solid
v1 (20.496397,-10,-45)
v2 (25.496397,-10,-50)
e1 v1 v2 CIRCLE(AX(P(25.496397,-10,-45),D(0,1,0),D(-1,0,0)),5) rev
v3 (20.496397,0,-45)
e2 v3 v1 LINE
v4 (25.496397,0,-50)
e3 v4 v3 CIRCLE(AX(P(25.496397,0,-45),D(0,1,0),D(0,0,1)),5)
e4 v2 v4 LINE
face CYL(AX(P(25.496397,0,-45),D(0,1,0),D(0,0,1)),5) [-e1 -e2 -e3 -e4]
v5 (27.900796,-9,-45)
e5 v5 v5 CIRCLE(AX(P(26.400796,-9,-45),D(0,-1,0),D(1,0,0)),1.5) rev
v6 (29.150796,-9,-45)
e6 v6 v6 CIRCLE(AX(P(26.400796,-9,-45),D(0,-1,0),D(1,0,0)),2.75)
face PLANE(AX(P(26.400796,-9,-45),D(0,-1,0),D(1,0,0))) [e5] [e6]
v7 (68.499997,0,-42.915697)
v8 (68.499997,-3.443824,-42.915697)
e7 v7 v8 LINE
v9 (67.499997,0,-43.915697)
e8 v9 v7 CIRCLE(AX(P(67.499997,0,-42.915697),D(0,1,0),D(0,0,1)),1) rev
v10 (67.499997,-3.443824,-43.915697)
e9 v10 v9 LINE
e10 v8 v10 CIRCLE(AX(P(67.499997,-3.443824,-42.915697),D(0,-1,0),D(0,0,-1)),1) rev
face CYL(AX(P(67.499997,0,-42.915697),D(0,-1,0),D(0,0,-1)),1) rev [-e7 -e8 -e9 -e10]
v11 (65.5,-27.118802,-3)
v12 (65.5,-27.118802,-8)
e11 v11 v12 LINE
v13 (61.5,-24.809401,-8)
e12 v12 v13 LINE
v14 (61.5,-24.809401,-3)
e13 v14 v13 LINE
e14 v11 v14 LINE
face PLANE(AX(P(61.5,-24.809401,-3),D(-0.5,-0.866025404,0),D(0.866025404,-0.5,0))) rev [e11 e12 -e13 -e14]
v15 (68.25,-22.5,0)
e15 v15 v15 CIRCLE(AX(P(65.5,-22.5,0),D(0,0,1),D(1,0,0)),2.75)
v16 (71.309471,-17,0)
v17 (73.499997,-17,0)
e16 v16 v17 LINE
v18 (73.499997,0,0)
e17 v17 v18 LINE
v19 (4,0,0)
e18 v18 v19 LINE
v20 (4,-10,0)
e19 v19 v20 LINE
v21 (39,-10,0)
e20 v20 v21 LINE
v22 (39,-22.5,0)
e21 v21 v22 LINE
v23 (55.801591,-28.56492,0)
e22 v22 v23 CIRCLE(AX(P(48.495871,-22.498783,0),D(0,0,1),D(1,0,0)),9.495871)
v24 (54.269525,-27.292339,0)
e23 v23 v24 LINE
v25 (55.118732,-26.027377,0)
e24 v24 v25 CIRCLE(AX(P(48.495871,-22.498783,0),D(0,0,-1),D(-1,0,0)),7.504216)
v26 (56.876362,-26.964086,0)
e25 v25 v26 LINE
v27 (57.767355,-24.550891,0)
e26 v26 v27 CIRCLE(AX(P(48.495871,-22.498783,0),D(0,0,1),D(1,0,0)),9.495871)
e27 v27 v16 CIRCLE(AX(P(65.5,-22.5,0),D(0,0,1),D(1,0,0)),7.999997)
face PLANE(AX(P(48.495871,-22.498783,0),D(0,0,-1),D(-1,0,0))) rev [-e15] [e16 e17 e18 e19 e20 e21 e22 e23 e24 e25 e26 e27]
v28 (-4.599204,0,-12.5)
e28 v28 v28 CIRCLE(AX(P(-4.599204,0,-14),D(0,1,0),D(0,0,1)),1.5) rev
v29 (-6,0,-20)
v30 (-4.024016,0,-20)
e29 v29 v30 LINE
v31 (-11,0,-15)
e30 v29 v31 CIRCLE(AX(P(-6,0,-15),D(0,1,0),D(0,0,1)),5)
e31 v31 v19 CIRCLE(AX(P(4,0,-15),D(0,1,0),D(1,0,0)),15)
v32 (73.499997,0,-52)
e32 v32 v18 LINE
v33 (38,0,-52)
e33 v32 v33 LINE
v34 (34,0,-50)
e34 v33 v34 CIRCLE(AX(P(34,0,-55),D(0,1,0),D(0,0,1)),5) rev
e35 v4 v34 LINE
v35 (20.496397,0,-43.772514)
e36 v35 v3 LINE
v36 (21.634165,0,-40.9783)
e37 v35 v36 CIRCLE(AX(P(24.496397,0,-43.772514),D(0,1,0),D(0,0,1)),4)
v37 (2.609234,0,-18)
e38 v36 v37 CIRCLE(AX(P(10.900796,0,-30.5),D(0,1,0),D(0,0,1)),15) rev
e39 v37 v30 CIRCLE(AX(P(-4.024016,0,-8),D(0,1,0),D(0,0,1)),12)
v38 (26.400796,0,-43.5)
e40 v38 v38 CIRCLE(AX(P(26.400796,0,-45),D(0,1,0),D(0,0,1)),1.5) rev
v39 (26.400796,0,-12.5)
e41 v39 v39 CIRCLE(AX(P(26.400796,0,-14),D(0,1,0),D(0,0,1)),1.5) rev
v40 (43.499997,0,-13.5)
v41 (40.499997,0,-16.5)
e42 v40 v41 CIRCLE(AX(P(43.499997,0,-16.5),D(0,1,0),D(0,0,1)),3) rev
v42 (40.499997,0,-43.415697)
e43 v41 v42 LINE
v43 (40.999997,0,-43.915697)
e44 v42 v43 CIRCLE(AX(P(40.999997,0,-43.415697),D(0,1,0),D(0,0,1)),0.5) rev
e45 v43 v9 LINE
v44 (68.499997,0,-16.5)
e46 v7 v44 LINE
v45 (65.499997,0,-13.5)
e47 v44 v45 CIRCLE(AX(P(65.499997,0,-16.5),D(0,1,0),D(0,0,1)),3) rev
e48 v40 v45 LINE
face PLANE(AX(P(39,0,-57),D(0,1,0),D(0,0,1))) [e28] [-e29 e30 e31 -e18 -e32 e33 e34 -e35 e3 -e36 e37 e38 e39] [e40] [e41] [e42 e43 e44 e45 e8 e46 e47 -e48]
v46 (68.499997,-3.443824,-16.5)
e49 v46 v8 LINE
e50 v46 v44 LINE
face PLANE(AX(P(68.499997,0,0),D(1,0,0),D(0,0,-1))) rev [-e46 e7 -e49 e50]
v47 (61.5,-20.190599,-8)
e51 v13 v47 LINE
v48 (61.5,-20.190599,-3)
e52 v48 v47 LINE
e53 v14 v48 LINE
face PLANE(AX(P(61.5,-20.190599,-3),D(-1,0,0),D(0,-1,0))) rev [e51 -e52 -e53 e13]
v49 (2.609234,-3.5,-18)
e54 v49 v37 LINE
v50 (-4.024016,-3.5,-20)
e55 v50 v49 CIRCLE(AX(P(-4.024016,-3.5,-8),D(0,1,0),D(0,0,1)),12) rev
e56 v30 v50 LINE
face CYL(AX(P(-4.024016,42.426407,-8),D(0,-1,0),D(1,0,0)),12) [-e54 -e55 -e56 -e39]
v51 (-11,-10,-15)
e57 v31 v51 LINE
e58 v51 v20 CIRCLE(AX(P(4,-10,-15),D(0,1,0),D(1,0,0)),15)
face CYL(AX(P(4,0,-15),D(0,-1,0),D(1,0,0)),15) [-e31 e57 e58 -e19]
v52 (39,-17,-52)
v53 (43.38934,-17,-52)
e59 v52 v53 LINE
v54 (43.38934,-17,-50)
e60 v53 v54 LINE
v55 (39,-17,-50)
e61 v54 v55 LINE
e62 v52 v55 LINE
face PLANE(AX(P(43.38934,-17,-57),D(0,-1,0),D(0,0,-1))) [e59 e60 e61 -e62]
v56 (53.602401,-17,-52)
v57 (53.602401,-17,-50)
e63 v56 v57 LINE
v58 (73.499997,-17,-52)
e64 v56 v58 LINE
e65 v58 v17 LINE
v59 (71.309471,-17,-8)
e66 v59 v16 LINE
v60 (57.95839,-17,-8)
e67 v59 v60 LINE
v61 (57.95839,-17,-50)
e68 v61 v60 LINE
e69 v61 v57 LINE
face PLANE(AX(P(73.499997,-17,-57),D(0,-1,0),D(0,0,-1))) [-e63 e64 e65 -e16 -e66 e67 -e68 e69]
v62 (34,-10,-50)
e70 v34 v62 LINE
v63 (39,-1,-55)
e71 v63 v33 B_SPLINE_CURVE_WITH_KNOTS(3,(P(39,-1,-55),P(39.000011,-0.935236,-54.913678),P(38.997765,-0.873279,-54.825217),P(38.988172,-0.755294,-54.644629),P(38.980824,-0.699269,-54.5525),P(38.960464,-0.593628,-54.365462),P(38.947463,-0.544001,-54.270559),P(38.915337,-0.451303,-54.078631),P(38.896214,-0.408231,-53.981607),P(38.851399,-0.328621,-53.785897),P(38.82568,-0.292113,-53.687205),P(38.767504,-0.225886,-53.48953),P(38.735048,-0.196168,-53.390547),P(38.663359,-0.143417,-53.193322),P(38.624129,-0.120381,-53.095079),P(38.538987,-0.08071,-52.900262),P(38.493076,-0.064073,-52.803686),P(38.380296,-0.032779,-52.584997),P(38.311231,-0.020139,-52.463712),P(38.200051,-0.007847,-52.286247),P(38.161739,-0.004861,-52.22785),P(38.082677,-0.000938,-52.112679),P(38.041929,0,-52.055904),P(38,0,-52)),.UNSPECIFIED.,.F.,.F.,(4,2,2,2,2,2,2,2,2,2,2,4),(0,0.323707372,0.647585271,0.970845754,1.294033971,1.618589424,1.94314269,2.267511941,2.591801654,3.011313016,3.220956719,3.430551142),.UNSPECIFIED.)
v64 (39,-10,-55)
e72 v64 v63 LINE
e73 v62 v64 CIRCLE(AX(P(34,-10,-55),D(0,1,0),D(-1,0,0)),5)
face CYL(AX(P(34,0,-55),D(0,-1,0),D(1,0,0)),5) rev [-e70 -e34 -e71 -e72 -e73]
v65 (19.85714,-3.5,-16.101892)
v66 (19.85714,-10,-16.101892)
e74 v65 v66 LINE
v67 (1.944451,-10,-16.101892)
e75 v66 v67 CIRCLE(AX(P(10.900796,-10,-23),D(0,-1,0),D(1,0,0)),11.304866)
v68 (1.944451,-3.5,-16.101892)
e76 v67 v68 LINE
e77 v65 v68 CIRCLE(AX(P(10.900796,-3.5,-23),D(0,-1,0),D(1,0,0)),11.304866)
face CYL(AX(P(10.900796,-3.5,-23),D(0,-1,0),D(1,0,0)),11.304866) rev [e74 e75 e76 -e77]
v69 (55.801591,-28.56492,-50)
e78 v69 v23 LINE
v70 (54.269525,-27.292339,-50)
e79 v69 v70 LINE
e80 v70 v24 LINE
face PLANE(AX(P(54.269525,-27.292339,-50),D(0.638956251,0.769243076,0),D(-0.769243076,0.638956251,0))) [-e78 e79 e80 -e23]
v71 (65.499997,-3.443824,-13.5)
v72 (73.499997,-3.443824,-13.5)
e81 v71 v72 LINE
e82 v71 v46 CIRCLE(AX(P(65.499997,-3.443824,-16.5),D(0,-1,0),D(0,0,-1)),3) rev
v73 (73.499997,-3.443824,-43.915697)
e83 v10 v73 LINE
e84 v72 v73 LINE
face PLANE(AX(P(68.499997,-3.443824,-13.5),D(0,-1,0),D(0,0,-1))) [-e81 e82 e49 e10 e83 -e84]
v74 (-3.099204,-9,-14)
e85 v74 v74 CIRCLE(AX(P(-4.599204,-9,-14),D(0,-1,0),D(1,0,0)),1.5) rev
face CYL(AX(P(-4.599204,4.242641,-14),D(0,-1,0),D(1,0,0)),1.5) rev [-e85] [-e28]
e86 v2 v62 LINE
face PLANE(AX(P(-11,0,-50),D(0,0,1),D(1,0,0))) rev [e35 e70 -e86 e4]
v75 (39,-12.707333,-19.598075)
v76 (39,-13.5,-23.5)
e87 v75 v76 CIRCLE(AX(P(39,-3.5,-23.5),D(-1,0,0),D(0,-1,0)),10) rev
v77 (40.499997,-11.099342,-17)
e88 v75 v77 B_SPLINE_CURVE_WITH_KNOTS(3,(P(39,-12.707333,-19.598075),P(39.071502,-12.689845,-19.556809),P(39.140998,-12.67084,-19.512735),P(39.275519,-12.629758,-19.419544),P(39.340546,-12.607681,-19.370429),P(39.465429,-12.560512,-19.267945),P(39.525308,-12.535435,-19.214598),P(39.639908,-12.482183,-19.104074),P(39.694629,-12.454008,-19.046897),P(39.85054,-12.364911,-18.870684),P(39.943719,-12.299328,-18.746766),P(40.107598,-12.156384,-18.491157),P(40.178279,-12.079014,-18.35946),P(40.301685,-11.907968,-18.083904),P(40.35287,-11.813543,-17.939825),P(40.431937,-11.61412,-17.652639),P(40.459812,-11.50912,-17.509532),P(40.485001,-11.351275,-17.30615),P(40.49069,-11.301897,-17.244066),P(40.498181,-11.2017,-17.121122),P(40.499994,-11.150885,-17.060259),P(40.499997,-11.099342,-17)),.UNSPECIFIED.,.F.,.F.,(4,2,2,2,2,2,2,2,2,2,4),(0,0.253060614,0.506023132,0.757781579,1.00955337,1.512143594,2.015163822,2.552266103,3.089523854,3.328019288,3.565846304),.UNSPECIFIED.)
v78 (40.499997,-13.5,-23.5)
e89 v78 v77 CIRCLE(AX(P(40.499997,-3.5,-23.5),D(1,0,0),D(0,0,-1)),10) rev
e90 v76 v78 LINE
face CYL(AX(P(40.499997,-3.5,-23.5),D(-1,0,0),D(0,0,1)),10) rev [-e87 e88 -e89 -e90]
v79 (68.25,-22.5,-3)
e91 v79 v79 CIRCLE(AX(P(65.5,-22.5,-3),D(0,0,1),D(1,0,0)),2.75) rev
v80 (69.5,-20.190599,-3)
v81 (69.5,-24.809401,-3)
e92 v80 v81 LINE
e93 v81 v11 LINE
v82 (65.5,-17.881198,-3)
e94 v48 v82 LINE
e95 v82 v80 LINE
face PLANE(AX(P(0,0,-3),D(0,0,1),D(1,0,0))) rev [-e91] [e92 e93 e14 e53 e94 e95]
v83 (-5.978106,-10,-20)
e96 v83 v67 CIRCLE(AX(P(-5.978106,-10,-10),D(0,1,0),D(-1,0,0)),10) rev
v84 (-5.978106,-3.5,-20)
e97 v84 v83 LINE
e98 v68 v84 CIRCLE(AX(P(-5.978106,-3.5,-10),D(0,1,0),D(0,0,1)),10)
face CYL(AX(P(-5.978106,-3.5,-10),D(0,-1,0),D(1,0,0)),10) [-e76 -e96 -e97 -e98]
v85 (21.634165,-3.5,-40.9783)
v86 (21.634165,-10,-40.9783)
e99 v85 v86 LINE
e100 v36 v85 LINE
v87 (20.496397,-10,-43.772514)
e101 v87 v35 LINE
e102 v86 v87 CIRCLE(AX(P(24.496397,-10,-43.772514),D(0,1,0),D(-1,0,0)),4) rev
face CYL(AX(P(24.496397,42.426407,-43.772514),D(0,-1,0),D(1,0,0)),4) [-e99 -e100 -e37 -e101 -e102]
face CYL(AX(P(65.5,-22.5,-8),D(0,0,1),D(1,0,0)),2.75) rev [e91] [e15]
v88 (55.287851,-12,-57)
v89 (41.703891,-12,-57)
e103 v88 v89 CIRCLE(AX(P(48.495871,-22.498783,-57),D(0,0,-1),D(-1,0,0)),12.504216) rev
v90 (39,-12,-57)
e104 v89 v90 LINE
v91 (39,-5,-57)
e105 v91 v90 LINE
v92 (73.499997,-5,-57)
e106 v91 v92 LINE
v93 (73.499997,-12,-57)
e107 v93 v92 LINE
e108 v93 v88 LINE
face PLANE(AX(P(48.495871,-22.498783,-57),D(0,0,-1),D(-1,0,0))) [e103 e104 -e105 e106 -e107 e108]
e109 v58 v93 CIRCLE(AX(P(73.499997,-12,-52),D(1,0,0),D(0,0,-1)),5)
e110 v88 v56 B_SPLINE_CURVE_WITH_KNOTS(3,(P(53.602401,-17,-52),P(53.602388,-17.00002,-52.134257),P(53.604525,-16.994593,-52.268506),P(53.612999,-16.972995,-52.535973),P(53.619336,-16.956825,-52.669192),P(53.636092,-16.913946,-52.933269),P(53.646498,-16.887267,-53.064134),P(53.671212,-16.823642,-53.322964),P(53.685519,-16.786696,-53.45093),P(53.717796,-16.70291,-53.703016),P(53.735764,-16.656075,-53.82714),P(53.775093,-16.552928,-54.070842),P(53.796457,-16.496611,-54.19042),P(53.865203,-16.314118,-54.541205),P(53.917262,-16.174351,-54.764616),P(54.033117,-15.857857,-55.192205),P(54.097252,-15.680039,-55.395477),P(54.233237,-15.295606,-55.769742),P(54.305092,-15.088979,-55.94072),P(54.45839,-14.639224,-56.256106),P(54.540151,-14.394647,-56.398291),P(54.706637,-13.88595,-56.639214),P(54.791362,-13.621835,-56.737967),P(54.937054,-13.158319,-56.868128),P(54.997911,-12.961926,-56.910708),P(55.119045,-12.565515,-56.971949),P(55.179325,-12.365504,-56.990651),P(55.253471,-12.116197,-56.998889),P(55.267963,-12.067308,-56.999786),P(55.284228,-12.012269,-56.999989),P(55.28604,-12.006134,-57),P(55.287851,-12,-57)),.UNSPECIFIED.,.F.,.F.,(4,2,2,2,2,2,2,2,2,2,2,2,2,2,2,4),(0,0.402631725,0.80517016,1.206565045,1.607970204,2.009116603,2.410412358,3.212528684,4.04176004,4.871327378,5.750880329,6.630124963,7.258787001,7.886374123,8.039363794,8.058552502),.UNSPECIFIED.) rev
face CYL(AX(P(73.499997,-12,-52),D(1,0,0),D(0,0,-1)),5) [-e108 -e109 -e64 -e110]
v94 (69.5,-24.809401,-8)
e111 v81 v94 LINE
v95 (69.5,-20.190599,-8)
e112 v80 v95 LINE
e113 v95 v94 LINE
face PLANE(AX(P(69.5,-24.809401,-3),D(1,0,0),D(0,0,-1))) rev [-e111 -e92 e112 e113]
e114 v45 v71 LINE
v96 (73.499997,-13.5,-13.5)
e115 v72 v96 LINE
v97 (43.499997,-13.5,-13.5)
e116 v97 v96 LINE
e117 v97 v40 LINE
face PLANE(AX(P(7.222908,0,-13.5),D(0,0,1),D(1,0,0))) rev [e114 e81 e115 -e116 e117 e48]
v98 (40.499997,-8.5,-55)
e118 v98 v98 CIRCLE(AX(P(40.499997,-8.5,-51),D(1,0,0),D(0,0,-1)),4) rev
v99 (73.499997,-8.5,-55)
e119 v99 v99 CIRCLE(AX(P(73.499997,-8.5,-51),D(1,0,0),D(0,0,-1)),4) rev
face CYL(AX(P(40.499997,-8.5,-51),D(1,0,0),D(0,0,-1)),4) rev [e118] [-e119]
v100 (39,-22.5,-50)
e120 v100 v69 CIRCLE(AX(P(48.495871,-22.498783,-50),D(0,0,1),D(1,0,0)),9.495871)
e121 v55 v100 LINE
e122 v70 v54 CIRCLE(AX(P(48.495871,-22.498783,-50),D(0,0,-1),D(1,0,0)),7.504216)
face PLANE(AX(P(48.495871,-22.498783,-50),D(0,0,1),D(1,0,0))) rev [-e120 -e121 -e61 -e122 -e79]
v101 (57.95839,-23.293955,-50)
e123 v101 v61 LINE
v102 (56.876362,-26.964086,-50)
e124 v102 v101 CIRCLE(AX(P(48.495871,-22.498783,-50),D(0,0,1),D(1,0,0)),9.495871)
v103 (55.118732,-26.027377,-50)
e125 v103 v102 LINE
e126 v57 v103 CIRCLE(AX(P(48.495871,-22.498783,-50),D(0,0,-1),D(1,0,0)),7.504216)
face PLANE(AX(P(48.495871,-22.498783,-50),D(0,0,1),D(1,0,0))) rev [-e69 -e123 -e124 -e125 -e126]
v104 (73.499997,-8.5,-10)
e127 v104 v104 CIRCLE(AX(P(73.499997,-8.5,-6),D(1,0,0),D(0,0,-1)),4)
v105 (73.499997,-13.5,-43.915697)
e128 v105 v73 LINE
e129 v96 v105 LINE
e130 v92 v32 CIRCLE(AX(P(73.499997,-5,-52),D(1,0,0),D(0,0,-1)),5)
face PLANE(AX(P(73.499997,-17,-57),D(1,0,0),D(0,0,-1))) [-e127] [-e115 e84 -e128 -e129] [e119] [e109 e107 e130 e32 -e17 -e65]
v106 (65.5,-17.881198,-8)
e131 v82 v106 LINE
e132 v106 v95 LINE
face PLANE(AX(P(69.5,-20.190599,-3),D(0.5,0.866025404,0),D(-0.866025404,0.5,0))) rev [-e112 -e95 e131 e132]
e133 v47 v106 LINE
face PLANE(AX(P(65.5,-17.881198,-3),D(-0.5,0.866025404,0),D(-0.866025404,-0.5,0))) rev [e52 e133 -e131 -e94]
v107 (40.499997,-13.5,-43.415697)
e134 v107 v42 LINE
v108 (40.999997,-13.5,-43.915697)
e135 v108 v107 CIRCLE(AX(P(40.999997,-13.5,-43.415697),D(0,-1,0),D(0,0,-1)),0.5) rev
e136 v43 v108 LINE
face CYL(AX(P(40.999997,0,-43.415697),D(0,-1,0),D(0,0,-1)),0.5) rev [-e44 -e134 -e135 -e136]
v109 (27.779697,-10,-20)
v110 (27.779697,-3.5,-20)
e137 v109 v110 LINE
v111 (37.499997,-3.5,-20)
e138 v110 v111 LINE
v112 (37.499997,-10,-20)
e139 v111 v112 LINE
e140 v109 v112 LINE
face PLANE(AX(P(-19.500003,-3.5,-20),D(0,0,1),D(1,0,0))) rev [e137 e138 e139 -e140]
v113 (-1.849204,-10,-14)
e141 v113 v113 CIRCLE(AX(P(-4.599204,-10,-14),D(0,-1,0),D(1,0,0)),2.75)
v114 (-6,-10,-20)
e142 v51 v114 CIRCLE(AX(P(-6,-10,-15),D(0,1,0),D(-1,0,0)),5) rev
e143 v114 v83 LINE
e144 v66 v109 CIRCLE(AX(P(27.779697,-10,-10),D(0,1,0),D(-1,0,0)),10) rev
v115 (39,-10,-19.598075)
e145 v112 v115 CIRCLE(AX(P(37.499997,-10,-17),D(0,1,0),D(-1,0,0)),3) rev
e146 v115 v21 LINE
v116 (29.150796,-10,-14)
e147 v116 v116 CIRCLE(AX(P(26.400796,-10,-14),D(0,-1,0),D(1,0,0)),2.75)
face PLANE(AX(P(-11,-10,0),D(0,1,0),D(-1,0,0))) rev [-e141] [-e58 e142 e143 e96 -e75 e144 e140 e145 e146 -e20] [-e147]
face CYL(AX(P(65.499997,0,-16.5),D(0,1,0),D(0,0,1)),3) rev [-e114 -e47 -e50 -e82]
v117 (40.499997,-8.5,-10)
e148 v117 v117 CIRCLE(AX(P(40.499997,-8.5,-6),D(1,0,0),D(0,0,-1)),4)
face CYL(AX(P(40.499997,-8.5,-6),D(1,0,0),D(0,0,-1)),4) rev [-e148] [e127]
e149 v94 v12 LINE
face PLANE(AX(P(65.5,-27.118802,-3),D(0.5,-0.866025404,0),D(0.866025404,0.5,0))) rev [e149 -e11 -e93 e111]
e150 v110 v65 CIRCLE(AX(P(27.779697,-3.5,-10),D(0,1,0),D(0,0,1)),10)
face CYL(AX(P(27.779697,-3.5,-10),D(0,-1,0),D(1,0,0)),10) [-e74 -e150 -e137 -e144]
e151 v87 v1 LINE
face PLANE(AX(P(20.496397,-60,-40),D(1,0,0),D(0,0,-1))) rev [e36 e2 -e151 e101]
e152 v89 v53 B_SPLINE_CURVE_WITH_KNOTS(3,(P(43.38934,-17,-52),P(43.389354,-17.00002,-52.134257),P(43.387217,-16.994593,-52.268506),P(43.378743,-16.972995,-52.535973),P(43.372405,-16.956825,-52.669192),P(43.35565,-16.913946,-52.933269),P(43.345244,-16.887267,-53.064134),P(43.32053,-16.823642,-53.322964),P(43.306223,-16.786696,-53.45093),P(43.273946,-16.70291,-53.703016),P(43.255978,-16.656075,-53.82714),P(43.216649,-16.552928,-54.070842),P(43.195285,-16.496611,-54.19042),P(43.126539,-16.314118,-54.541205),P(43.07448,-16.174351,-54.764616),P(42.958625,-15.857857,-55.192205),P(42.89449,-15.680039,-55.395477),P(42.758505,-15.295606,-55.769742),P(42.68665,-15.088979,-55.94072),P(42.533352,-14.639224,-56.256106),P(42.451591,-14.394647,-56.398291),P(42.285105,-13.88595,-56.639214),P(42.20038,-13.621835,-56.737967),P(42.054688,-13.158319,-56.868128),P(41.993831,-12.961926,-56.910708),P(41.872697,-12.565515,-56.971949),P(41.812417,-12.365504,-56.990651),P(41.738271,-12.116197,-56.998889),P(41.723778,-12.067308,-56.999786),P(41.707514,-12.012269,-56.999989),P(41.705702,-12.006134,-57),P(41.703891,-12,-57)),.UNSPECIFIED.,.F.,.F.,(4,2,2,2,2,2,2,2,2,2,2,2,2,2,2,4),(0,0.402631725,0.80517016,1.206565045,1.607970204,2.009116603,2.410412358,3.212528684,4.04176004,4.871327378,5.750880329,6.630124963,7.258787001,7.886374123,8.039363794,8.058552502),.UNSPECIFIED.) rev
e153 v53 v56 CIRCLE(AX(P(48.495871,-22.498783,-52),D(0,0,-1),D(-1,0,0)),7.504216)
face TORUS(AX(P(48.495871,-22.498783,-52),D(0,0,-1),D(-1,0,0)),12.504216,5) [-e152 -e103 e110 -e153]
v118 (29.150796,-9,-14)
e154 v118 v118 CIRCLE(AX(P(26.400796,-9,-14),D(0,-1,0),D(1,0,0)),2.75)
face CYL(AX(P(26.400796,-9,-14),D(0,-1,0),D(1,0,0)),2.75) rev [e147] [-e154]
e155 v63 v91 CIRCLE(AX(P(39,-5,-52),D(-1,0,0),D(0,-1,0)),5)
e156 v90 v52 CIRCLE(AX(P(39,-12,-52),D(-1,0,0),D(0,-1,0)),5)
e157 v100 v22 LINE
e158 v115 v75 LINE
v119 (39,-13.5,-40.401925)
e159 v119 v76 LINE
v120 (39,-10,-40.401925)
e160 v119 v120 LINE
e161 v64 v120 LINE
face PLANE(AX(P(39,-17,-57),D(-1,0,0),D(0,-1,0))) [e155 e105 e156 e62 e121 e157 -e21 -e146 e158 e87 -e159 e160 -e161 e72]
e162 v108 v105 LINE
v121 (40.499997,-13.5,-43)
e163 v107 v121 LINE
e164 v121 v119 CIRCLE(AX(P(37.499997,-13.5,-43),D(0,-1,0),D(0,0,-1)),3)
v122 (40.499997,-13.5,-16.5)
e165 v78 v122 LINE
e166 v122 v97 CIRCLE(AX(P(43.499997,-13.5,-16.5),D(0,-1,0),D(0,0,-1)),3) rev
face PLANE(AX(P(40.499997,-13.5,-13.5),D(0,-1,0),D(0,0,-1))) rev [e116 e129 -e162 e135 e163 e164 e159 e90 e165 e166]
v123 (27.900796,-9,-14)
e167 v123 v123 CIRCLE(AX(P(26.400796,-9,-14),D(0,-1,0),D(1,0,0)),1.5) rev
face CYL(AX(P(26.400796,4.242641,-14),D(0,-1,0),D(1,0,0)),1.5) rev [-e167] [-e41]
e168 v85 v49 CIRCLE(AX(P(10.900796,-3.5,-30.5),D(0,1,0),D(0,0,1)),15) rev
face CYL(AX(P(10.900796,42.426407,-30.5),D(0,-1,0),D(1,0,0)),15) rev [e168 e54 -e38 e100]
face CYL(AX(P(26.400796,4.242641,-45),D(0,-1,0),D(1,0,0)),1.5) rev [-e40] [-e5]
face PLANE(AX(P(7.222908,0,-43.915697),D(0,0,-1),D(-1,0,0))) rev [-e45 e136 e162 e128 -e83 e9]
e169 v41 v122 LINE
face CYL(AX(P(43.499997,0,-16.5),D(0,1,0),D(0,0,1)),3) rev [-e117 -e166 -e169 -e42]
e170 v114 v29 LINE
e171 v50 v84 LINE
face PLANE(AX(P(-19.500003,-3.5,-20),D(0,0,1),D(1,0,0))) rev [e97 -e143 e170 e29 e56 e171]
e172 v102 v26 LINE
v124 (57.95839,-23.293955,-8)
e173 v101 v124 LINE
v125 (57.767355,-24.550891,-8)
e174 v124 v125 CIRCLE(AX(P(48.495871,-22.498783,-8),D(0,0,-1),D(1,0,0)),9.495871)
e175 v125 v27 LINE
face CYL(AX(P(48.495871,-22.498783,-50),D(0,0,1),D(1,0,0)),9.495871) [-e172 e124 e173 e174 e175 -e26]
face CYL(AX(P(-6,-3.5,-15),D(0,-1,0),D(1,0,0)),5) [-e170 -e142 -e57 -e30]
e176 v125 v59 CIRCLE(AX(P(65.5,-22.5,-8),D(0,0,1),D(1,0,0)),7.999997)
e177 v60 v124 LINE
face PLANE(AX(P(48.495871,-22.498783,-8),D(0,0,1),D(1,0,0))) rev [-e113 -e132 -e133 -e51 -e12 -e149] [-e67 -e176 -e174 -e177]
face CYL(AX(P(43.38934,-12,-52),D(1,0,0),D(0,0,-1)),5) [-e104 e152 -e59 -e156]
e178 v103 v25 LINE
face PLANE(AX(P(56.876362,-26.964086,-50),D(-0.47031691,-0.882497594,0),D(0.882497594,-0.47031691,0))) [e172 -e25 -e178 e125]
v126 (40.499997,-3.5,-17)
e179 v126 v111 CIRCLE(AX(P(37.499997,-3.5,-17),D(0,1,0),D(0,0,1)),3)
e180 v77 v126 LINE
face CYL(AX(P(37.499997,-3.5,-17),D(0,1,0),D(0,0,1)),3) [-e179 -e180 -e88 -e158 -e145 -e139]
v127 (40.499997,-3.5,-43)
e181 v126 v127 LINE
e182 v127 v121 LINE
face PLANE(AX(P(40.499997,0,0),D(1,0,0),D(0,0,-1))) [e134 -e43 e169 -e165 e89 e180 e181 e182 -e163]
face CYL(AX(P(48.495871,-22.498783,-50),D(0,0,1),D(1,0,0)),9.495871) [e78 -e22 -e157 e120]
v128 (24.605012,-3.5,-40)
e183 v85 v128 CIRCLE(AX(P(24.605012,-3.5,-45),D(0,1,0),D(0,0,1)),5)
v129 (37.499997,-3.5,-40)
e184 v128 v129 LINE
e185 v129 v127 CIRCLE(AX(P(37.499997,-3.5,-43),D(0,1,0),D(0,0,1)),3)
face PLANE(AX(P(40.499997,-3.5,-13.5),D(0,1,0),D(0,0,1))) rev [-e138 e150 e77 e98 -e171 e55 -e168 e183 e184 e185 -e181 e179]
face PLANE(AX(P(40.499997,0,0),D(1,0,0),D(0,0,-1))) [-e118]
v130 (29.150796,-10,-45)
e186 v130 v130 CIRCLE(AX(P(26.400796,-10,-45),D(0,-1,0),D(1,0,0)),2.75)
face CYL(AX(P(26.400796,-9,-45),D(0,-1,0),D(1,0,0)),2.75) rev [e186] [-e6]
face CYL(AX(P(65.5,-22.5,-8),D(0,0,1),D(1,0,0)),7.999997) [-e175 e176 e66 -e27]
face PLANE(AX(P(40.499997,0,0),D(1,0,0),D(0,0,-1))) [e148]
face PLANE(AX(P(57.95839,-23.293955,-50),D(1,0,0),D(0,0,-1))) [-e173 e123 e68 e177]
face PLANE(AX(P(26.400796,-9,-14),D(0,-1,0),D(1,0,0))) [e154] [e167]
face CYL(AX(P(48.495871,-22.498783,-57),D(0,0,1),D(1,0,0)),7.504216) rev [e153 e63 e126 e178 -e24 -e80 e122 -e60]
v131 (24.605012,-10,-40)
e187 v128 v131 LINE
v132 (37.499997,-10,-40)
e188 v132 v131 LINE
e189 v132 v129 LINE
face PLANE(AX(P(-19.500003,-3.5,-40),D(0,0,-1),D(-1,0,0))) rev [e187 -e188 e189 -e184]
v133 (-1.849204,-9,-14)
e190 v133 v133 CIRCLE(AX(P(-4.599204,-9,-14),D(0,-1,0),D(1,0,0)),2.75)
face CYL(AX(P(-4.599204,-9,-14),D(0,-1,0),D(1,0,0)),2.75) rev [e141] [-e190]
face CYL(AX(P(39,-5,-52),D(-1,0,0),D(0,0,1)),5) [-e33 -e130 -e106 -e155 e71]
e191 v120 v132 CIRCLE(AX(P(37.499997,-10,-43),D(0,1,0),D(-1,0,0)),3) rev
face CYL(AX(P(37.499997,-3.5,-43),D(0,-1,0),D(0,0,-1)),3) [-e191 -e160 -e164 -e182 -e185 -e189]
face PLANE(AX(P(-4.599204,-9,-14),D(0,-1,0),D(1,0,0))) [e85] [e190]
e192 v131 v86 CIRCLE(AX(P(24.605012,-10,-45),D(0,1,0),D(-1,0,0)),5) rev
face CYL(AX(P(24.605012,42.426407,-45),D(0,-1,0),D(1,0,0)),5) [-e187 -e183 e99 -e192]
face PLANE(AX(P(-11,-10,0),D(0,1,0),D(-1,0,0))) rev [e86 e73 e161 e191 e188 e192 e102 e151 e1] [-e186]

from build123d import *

# Parameters (mm, degrees)
EXTRUDE1_DEPTH               = 57
SKETCH2_R                    = 2.75
EXTRUDE2_DEPTH               = 8
EXTRUDE3_DEPTH               = 5
EXTRUDE4_DEPTH               = 50
SKETCH5_R                    = 4
EXTRUDE5_DEPTH               = 33
SKETCH6_W                    = 30
SKETCH6_H                    = 10
EXTRUDE6_DEPTH               = 33
SKETCH7_W                    = 50
SKETCH7_H                    = 10
EXTRUDE7_DEPTH               = 50
SKETCH10_R                   = 1.5
EXTRUDE10_DEPTH              = 10
SKETCH11_R                   = 2.75
EXTRUDE13_DEPTH              = 1
SKETCH12_R                   = 15
EXTRUDE14_DEPTH              = 10
FILLET2_R                    = 5
FILLET3_R                    = 5
FILLET4_R                    = 10
EXTRUDE15_REACH              = 96.553
SKETCH14_W                   = 20
SKETCH14_H                   = 10
EXTRUDE16_DEPTH              = 60
EXTRUDE18_DEPTH              = 60
FILLET5_R                    = 10
FILLET7_R                    = 3
FILLET8_R                    = 5
FILLET9_R                    = 5
SKETCH16_R                   = 11.304866209
EXTRUDE19_DEPTH              = 6.5
FILLET11_R                   = 12
FILLET12_R                   = 10
FILLET13_R                   = 4
FILLET14_R                   = 5
FILLET15_R                   = 5
EXTRUDE21_DEPTH              = 10
SCHIZZO1_W                   = 30.415697361
SCHIZZO1_H                   = 13.5
TAGLIO_ESTRUSIONE1_DEPTH     = 33
RACCORDO1_R                  = 3
RACCORDO2_R                  = 0.5
SCHIZZO2_W                   = 30.415697361
SCHIZZO2_H                   = 3.443824092
ESTRUSIONE_ESTRUSIONE1_DEPTH = 5
RACCORDO3_R                  = 1
RACCORDO4_R                  = 3
SCHIZZO3_W                   = 12.709856415
SCHIZZO3_H                   = 30.470472699
ESTRUSIONE_ESTRUSIONE2_DEPTH = 3.5


# Some blends are built 0.0001 mm under size
with BuildPart() as part:
    # Sketch1 → Extrude1 (new body)
    with BuildSketch(Plane.XY):
        with BuildLine():
            Line((73.499997202, -17), (73.499997202, 0))
            Line((73.499997202, 0), (39, 0))
            Line((39, 0), (39, -17))
            Line((39, -17), (43.389340395, -17))
            ThreePointArc((43.389340395, -17), (48.49587093, -14.994566191), (53.602401465, -17))
            Line((53.602401465, -17), (73.499997202, -17))
        make_face()
    extrude(amount=-EXTRUDE1_DEPTH)

    # Sketch2 → Extrude2 (add)
    with BuildSketch(Plane.XY):
        with BuildLine():
            Line((57.95839, -23.293955), (57.95839, -17))
            Line((57.95839, -17), (71.309471167, -17))
            ThreePointArc((71.309471167, -17), (69.395977388, -29.48722516), (57.767354943, -24.550891432))
            ThreePointArc((57.767354943, -24.550891432), (57.883931975, -23.925623937), (57.95839, -23.293955))
        make_face()
        with Locations((65.5, -22.5)):
            Circle(SKETCH2_R, mode=Mode.SUBTRACT)
    extrude(amount=-EXTRUDE2_DEPTH)

    # Sketch3 → Extrude3 (cut)
    with BuildSketch(Plane(origin=(0, 0, -8), x_dir=(-1, 0, 0), z_dir=(0, 0, -1))):
        Polygon((-69.5, -20.190598923), (-65.5, -17.881197846), (-61.5, -20.190598923), (-61.5, -24.809401077), (-65.5, -27.118802154), (-69.5, -24.809401077), align=None)
    extrude(amount=-EXTRUDE3_DEPTH, mode=Mode.SUBTRACT)

    # Sketch4 → Extrude4 (add)
    with BuildSketch(Plane.XY):
        with BuildLine():
            Line((39, -17), (39, -22.5))
            ThreePointArc((39, -22.5), (45.271742795, -31.43055539), (55.801591252, -28.564919557))
            Line((55.801591252, -28.564919557), (54.269524764, -27.292339419))
            ThreePointArc((54.269524764, -27.292339419), (43.338902241, -27.950290613), (43.389340395, -17))
            Line((43.389340395, -17), (39, -17))
        make_face()
        with BuildLine():
            Line((56.876362299, -26.964085637), (55.118731957, -26.027376827))
            ThreePointArc((55.118731957, -26.027376827), (55.896414133, -21.25571178), (53.602401465, -17))
            Line((53.602401465, -17), (57.95839, -17))
            Line((57.95839, -17), (57.95839, -23.293955))
            ThreePointArc((57.95839, -23.293955), (57.60414849, -25.184084529), (56.876362299, -26.964085637))
        make_face()
    extrude(amount=-EXTRUDE4_DEPTH)

    # Sketch5 → Extrude5 (cut)
    with BuildSketch(Plane(origin=(73.499997202, 0, 0), x_dir=(0, 0, -1), z_dir=(1, 0, 0))):
        with Locations((6, -8.5)):
            Circle(SKETCH5_R)
        with Locations((51, -8.5)):
            Circle(SKETCH5_R)
    extrude(amount=-EXTRUDE5_DEPTH, mode=Mode.SUBTRACT)

    # Sketch6 → Extrude6 (cut)
    with BuildSketch(Plane(origin=(73.499997202, 0, 0), x_dir=(0, 0, -1), z_dir=(1, 0, 0))):
        with Locations((28.5, -8.5)):
            Rectangle(SKETCH6_W, SKETCH6_H)
    extrude(amount=-EXTRUDE6_DEPTH, mode=Mode.SUBTRACT)

    # Sketch7 → Extrude7 (add)
    with BuildSketch(Plane.ZY.offset(-39)):
        with Locations((-25, -5)):
            Rectangle(SKETCH7_W, SKETCH7_H)
    extrude(amount=EXTRUDE7_DEPTH)

    # Sketch10 → Extrude10 (cut)
    with BuildSketch(Plane.XZ.offset(10)):
        with Locations((-4.599204374, -45)):
            Circle(SKETCH10_R)
        with Locations((26.400795626, -45)):
            Circle(SKETCH10_R)
        with Locations((26.400795626, -14)):
            Circle(SKETCH10_R)
        with Locations((-4.599204374, -14)):
            Circle(SKETCH10_R)
    extrude(amount=-EXTRUDE10_DEPTH, mode=Mode.SUBTRACT)

    # Sketch11 → Extrude13 (cut)
    with BuildSketch(Plane.XZ.offset(10)):
        with Locations((-4.599204374, -14)):
            Circle(SKETCH11_R)
        with Locations((26.400795626, -14)):
            Circle(SKETCH11_R)
        with Locations((26.400795626, -45)):
            Circle(SKETCH11_R)
    extrude(amount=-EXTRUDE13_DEPTH, mode=Mode.SUBTRACT)

    # Sketch12 → Extrude14 (cut)
    with BuildSketch(Plane.XZ.offset(10)):
        with Locations((10.900795626, -30.5)):
            Circle(SKETCH12_R)
    extrude(amount=-EXTRUDE14_DEPTH, mode=Mode.SUBTRACT)

    # Fillet2
    fillet2_edges = [part.edges().sort_by_distance(p)[0] for p in [
        (48.49587093, -14.994566191, -57),
        (63.551199334, -17, -57),
        (41.194670197, -17, -57),
    ]]
    fillet(fillet2_edges, radius=FILLET2_R)

    # Fillet3
    fillet3_edges = [part.edges().sort_by_distance(p)[0] for p in [
        (56.249998601, 0, -57),
    ]]
    fillet(fillet3_edges, radius=FILLET3_R)

    # Fillet4
    fillet4_edges = [part.edges().sort_by_distance(p)[0] for p in [
        (56.999997202, -13.5, -43.5),
    ]]
    fillet(fillet4_edges, radius=FILLET4_R - 0.0001)  # a hair under: the kernel refuses the full size

    # Extrude15: up to this face of the body (flat: up to its plane)
    extrude15_end = Plane(part.part.faces().sort_by_distance((35.938109504, 0, -24.375937497))[0])
    # Sketch13 → Extrude15 (cut, up to the picked face)
    with BuildSketch(Plane.XZ.offset(17), mode=Mode.PRIVATE) as extrude15_sk1:
        with BuildLine():
            Line((57.95839, -16.137451745), (57.95839, -43.862548255))
            ThreePointArc((57.95839, -43.862548255), (69.999997202, -30), (57.95839, -16.137451745))
        make_face()
    extrude15_tool1 = split(extrude(extrude15_sk1.sketch, amount=-EXTRUDE15_REACH, mode=Mode.PRIVATE), bisect_by=extrude15_end, keep=Keep.BOTH, mode=Mode.PRIVATE)
    add(extrude15_tool1.solids().sort_by(Axis((63.013259, -17, -30), (0, 1, 0)))[0], mode=Mode.SUBTRACT)

    # Sketch14 → Extrude16 (cut)
    with BuildSketch(Plane(origin=(40.499997202, 0, 0), x_dir=(0, 0, -1), z_dir=(1, 0, 0))):
        with Locations((30, -8.5)):
            Rectangle(SKETCH14_W, SKETCH14_H)
    extrude(amount=-EXTRUDE16_DEPTH, mode=Mode.SUBTRACT)

    # Sketch15 → Extrude18 (cut)
    with BuildSketch(Plane(origin=(0, 0, 0), x_dir=(1, 0, 0), z_dir=(0, 1, 0))):
        Polygon((2.11392048, 20), (-12.43887347, 20), (-12.43887347, 50), (20.496397049, 50), (20.496397049, 40), (2.11392048, 40), align=None)
    extrude(amount=-EXTRUDE18_DEPTH, mode=Mode.SUBTRACT)

    # Fillet5
    # the kernel refuses this fillet: 10 mm, written as the material it adds along each edge
    with BuildSketch(Plane(origin=(73.499997202, -13.5, -13.5), x_dir=(0, 1, 0), z_dir=(-1, 0, 0))) as fillet5_piece_1_section:
        with BuildLine():
            CenterArc((FILLET5_R, FILLET5_R), FILLET5_R, 180, 90)
            Line((0, FILLET5_R), (0, 0))
            Line((0, 0), (FILLET5_R, 0))
        make_face()
    fillet5_piece_1 = extrude(amount=33, mode=Mode.PRIVATE)
    fillet5_piece_1 = split(fillet5_piece_1, bisect_by=Plane(origin=(57.95839, -13.5, -13.5), z_dir=(1, 0, 0)), keep=Keep.TOP, mode=Mode.PRIVATE)
    fillet5_piece_1 = fillet5_piece_1 - Plane(origin=(55.999766898, -13.5, -30), x_dir=(0.13989934874108464, 0, -0.9901657296744927), z_dir=(0, -1, 0)) * Cylinder(14.000230304, 106, mode=Mode.PRIVATE)
    add(fillet5_piece_1)
    with BuildSketch(Plane(origin=(73.499997202, -13.5, -13.5), x_dir=(0, 1, 0), z_dir=(-1, 0, 0))) as fillet5_piece_2_section:
        with BuildLine():
            CenterArc((FILLET5_R, FILLET5_R), FILLET5_R, 180, 90)
            Line((0, FILLET5_R), (0, 0))
            Line((0, 0), (FILLET5_R, 0))
        make_face()
    fillet5_piece_2 = extrude(amount=33, mode=Mode.PRIVATE)
    fillet5_piece_2 = split(fillet5_piece_2, bisect_by=Plane(origin=(57.95839, -13.5, -13.5), z_dir=(-1, 0, 0)), keep=Keep.TOP, mode=Mode.PRIVATE)
    fillet5_piece_2 = fillet5_piece_2 - Plane(origin=(55.999766898, -13.5, -30), x_dir=(0.13989934874108464, 0, -0.9901657296744927), z_dir=(0, -1, 0)) * Cylinder(14.000230304, 106, mode=Mode.PRIVATE)
    add(fillet5_piece_2)
    with BuildSketch(Plane(origin=(73.499997202, -13.5, -13.5), x_dir=(0, 1, 0), z_dir=(-1, 0, 0))) as fillet5_piece_3_section:
        with BuildLine():
            CenterArc((FILLET5_R, FILLET5_R), FILLET5_R, 180, 90)
            Line((0, FILLET5_R), (0, 0))
            Line((0, 0), (FILLET5_R, 0))
        make_face()
    fillet5_piece_3 = extrude(amount=33, mode=Mode.PRIVATE)
    fillet5_piece_3 = split(fillet5_piece_3, bisect_by=Plane(origin=(57.95839, -13.5, -13.5), z_dir=(-1, 0, 0)), keep=Keep.TOP, mode=Mode.PRIVATE)
    fillet5_piece_3 = fillet5_piece_3 & Plane(origin=(55.999766898, -13.5, -30), x_dir=(0.13989934874108464, 0, -0.9901657296744927), z_dir=(0, -1, 0)) * Cylinder(14.000230304, 106, mode=Mode.PRIVATE)
    add(fillet5_piece_3)
    with BuildSketch(Plane(origin=(73.499997202, -13.5, -13.5), x_dir=(0, 1, 0), z_dir=(-1, 0, 0))) as fillet5_piece_4_section:
        with BuildLine():
            CenterArc((FILLET5_R, FILLET5_R), FILLET5_R, 180, 90)
            Line((0, FILLET5_R), (0, 0))
            Line((0, 0), (FILLET5_R, 0))
        make_face()
    fillet5_piece_4 = extrude(amount=58, mode=Mode.PRIVATE)
    fillet5_piece_4 = split(fillet5_piece_4, bisect_by=Plane(origin=(40.499997202, -13.5, -13.5), z_dir=(-1, 0, 0)), keep=Keep.TOP, mode=Mode.PRIVATE)
    fillet5_piece_4 = split(fillet5_piece_4, bisect_by=Plane(origin=(39, -13.5, -13.5), z_dir=(1, 0, 0)), keep=Keep.TOP, mode=Mode.PRIVATE)
    add(fillet5_piece_4)

    # Fillet7
    # the kernel refuses this fillet: 3 mm, written as the material it takes off along each edge
    with BuildSketch(Plane(origin=(40.499997202, -18.59939602, -40), x_dir=(0, 0, -1), z_dir=(0, 1, 0))) as fillet7_piece_1_section:
        with BuildLine():
            CenterArc((FILLET7_R, FILLET7_R), FILLET7_R, 180, 90)
            Line((0, FILLET7_R), (0, 0))
            Line((0, 0), (FILLET7_R, 0))
        make_face()
    fillet7_piece_1 = extrude(amount=15.09939602, mode=Mode.PRIVATE)
    fillet7_piece_1 = split(fillet7_piece_1, bisect_by=Plane(origin=(40.499997202, -13.5, -40), z_dir=(0, 1, 0)), keep=Keep.TOP, mode=Mode.PRIVATE)
    add(fillet7_piece_1, mode=Mode.SUBTRACT)
    with BuildSketch(Plane(origin=(40.499997202, -3.5, -20), x_dir=(0, 0, 1), z_dir=(0, -1, 0))) as fillet7_piece_2_section:
        with BuildLine():
            CenterArc((FILLET7_R, FILLET7_R), FILLET7_R, 180, 90)
            Line((0, FILLET7_R), (0, 0))
            Line((0, 0), (FILLET7_R, 0))
        make_face()
    fillet7_piece_2 = extrude(amount=16.867496998, mode=Mode.PRIVATE)
    fillet7_piece_2 = fillet7_piece_2 & Plane(origin=(40.499997202, -3.5, -23.5), x_dir=(0, 1, 0), z_dir=(1, 0, 0)) * Cylinder(10, 46, mode=Mode.PRIVATE)
    add(fillet7_piece_2, mode=Mode.SUBTRACT)

    # Fillet8
    fillet8_edges = [part.edges().sort_by_distance(p)[0] for p in [
        (-11, -5, -20),
    ]]
    fillet(fillet8_edges, radius=FILLET8_R)

    # Fillet9
    fillet9_edges = [part.edges().sort_by_distance(p)[0] for p in [
        (20.496397049, -5, -50),
    ]]
    fillet(fillet9_edges, radius=FILLET9_R)

    # Sketch16 → Extrude19 (cut)
    with BuildSketch(Plane.XZ.offset(10)):
        with Locations((10.900795626, -23)):
            Circle(SKETCH16_R)
    extrude(amount=-EXTRUDE19_DEPTH, mode=Mode.SUBTRACT)

    # Fillet11
    fillet11_edges = [part.edges().sort_by_distance(p)[0] for p in [
        (0.188652983, -1.75, -20),
    ]]
    fillet(fillet11_edges, radius=FILLET11_R)

    # Fillet12
    # the kernel refuses this fillet: 10 mm, written as the material it takes off along each edge
    with BuildSketch(Plane(origin=(0.248932323, -25.691286784, -19.213470169), x_dir=(-0.9921172382235202, 0, -0.12531315022668255), z_dir=(0, 1, 0))) as fillet12_piece_1:
        with BuildLine():
            CenterArc((5.023383211, 9.921172382), FILLET12_R, 224.802027264, 52.396812902)
            Line((-2.072074833, 2.874579224), (-2.781620637, 2.169919908))
            ThreePointArc((-2.781620637, 2.169919908), (-1.733922523, 0.934235059), (-0.892836327, -0.450381276))
            Line((-0.892836327, -0.450381276), (-0.236172529, -0.971711138))
            ThreePointArc((-0.236172529, -0.971711138), (4.463141301, -1.236990436), (6.401827864, -0.992117238))
            Line((6.401827864, -0.992117238), (6.276514713, 0))
        make_face()
    extrude(amount=22.191286784, mode=Mode.SUBTRACT)
    with BuildSketch(Plane(origin=(21.800336901, -3.5, -20), x_dir=(-0.44613745720692305, 0, 0.8949644514040438), z_dir=(0, -1, 0))) as fillet12_piece_2:
        with BuildLine():
            CenterArc((6.282027837, -9.812689637), FILLET12_R, 101.107051159, 52.396812902)
            Line((-2.667616677, -5.351315065), (0, 0))
            ThreePointArc((0, 0), (2.177800275, -0.21175186), (4.35560055, 0))
        make_face()
    extrude(amount=21.44840118, mode=Mode.SUBTRACT)

    # Fillet13
    fillet13_edges = [part.edges().sort_by_distance(p)[0] for p in [
        (20.496397049, -5, -42.029285899),
    ]]
    fillet(fillet13_edges, radius=FILLET13_R)

    # Fillet14
    # the kernel refuses this fillet: 5 mm, written as the material it takes off along each edge
    with BuildSketch(Plane(origin=(22.508982392, -3.5, -40), x_dir=(-0.66658148626187, 0, -0.7454321714099255), z_dir=(0, -1, 0))) as fillet14_piece_1:
        with BuildLine():
            CenterArc((2.329986209, 4.895355464), FILLET14_R, 221.803767382, 36.4534432)
            Line((-1.397174648, 1.562448032), (-1.471717865, 1.495789884))
            Line((-1.471717865, 1.495789884), (-0.074543217, -0.066658149))
            Line((-0.074543217, -0.066658149), (0.004374645, -0.099904267))
            ThreePointArc((0.004374645, -0.099904267), (0.656196759, -0.085639987), (1.292041664, -0.097907109))
            Line((1.292041664, -0.097907109), (1.312393518, 0))
        make_face()
    extrude(amount=11.740074457, mode=Mode.SUBTRACT)

    # Fillet15
    fillet15_edges = [part.edges().sort_by_distance(p)[0] for p in [
        (39, -5, -50),
    ]]
    fillet(fillet15_edges, radius=FILLET15_R)

    # Sketch17 → Extrude21 (cut)
    with BuildSketch(Plane.XZ.offset(10)):
        with BuildLine():
            Line((4, 0), (4, 2.372948922))
            Line((4, 2.372948922), (-13.409134184, 2.372948922))
            Line((-13.409134184, 2.372948922), (-13.409134184, -15))
            Line((-13.409134184, -15), (-11, -15))
            ThreePointArc((-11, -15), (-6.606601718, -4.393398282), (4, 0))
        make_face()
    extrude(amount=-EXTRUDE21_DEPTH, mode=Mode.SUBTRACT)

    # Schizzo1 → Taglio-Estrusione1 (cut)
    with BuildSketch(Plane(origin=(73.499997202, 0, 0), x_dir=(0, 0, -1), z_dir=(1, 0, 0))):
        with Locations((28.70784868, -6.75)):
            Rectangle(SCHIZZO1_W, SCHIZZO1_H)
    extrude(amount=-TAGLIO_ESTRUSIONE1_DEPTH, mode=Mode.SUBTRACT)

    # Raccordo1
    raccordo1_edges = [part.edges().sort_by_distance(p)[0] for p in [
        (40.499997202, -6.75, -13.5),
    ]]
    fillet(raccordo1_edges, radius=RACCORDO1_R)

    # Raccordo2
    raccordo2_edges = [part.edges().sort_by_distance(p)[0] for p in [
        (40.499997202, -6.75, -43.915697361),
    ]]
    fillet(raccordo2_edges, radius=RACCORDO2_R)

    # Schizzo2 → Estrusione-Estrusione1 (add)
    with BuildSketch(Plane(origin=(73.499997202, 0, 0), x_dir=(0, 0, -1), z_dir=(1, 0, 0))):
        with Locations((28.70784868, -1.721912046)):
            Rectangle(SCHIZZO2_W, SCHIZZO2_H)
    extrude(amount=-ESTRUSIONE_ESTRUSIONE1_DEPTH)

    # Raccordo3
    raccordo3_edges = [part.edges().sort_by_distance(p)[0] for p in [
        (68.499997202, -1.721912046, -43.915697361),
    ]]
    fillet(raccordo3_edges, radius=RACCORDO3_R)

    # Raccordo4
    raccordo4_edges = [part.edges().sort_by_distance(p)[0] for p in [
        (68.499997202, -1.721912046, -13.5),
    ]]
    fillet(raccordo4_edges, radius=RACCORDO4_R)

    # Schizzo3 → Estrusione-Estrusione2 (add)
    with BuildSketch(Plane.XZ.offset(17)):
        with Locations((64.313318208, -29.162710378)):
            Rectangle(SCHIZZO3_W, SCHIZZO3_H)
    extrude(amount=-ESTRUSIONE_ESTRUSIONE2_DEPTH)


solid = part.part
